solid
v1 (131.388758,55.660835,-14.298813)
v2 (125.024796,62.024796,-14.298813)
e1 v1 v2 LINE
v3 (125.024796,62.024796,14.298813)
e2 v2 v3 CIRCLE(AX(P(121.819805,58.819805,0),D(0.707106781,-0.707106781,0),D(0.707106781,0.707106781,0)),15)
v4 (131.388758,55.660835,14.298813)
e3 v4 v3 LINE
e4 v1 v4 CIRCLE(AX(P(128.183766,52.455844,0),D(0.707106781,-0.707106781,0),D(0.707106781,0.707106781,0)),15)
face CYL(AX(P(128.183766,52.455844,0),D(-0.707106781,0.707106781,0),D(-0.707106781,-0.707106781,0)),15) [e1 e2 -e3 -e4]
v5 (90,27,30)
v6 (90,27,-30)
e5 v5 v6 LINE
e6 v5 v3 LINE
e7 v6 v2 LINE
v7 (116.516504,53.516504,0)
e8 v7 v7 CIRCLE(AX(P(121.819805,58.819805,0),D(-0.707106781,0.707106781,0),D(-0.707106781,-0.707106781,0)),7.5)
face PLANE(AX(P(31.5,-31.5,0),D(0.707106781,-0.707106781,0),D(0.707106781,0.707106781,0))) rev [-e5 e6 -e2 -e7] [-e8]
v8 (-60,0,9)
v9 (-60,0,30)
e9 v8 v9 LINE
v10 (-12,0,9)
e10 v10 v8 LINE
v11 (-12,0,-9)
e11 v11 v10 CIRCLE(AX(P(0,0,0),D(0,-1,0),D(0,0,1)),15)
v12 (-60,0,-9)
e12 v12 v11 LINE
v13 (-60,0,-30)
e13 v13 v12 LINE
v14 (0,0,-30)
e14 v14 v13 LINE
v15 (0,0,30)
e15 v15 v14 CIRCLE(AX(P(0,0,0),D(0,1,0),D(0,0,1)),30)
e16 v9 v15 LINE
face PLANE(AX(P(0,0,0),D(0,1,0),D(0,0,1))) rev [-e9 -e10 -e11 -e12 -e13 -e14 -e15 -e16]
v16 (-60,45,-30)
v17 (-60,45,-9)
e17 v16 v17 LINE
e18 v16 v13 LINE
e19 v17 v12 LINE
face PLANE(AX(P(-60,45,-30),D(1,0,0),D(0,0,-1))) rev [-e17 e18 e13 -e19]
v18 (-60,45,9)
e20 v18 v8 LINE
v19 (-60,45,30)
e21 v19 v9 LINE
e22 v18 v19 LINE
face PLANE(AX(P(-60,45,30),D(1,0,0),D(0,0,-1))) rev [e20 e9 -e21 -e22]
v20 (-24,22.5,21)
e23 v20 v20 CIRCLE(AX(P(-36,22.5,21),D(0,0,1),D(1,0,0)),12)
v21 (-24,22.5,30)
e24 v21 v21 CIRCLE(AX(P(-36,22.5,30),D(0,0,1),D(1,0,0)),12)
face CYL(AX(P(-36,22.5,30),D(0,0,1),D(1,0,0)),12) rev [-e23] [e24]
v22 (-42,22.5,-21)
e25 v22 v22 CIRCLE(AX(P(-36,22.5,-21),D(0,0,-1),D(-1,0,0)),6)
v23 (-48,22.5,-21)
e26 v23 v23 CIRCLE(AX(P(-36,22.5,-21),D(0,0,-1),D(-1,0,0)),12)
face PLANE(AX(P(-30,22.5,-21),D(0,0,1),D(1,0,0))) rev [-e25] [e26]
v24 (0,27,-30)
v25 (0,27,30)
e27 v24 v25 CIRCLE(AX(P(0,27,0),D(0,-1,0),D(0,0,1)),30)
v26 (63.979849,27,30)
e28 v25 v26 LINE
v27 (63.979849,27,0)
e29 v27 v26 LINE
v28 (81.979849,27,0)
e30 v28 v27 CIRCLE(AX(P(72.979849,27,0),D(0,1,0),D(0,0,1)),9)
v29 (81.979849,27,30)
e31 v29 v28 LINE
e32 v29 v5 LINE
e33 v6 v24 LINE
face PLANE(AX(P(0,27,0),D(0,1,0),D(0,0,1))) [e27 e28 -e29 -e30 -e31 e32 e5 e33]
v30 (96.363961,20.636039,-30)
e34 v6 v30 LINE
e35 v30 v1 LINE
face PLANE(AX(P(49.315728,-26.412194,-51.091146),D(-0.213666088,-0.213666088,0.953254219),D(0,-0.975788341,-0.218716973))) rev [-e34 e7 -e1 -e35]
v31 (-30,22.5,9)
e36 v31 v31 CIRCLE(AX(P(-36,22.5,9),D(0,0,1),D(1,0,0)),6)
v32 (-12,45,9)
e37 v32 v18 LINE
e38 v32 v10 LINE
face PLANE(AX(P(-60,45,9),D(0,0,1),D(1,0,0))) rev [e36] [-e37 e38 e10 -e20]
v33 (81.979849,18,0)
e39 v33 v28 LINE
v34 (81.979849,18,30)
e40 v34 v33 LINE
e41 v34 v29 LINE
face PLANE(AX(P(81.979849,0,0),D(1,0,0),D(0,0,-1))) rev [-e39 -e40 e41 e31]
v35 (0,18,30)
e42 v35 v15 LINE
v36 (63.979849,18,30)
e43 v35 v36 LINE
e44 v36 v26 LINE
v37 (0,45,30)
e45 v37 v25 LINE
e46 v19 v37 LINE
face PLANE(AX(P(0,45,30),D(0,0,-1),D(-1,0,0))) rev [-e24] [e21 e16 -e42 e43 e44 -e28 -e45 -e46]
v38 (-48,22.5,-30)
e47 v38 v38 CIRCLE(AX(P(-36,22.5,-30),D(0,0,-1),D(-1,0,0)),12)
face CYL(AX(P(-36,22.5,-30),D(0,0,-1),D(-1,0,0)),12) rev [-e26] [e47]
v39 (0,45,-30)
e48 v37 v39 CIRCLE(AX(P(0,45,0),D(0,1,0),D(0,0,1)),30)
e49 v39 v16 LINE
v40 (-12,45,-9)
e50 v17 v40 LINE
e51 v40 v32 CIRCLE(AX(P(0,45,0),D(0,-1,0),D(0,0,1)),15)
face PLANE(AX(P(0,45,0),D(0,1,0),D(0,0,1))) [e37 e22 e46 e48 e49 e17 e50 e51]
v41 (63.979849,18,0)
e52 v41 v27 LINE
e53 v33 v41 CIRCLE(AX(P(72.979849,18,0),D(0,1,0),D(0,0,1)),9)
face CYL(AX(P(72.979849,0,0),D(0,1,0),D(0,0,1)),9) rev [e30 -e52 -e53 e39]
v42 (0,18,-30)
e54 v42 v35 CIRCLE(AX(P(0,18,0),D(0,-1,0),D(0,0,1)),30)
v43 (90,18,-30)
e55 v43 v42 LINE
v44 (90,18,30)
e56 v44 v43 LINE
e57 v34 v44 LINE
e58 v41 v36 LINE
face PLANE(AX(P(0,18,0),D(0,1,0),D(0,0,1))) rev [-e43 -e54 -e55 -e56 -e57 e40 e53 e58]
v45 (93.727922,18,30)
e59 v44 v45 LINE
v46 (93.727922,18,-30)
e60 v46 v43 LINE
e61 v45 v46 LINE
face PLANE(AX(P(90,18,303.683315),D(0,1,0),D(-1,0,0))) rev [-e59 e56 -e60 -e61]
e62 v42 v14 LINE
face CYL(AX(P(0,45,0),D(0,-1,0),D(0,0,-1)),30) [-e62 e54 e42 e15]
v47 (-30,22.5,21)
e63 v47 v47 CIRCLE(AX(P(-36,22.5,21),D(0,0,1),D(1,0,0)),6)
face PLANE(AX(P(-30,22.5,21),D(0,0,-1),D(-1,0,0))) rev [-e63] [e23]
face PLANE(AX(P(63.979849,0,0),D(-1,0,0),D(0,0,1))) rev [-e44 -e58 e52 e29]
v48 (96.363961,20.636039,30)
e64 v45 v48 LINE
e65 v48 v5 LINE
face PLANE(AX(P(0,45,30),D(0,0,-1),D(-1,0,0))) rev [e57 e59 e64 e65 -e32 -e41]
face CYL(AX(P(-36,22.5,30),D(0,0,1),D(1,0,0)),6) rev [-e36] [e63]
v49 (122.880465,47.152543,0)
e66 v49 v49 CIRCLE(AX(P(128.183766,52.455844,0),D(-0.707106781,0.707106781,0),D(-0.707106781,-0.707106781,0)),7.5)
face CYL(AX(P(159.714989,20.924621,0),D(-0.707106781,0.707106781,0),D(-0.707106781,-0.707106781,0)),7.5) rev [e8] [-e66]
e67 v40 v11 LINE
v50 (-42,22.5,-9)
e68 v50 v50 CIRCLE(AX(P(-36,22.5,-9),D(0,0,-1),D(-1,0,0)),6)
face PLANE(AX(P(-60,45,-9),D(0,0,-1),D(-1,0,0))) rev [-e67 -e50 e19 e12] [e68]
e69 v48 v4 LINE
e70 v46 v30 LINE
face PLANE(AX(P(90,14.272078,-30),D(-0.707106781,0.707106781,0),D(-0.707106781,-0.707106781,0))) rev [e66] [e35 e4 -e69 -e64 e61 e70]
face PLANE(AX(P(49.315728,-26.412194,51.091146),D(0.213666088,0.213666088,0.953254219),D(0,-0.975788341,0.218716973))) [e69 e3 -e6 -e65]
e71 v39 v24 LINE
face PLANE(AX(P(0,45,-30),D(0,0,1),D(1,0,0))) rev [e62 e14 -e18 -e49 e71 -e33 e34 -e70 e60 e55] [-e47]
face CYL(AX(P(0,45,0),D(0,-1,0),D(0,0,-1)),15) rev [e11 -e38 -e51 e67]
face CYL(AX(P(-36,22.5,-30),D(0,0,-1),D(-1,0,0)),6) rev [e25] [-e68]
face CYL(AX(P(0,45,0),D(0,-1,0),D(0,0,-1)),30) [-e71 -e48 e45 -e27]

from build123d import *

# Parameters (mm, degrees)
BOSS_EXTRUDE1_DEPTH                                  = 45
CBORE_FOR_M24_HEX_SOCKET_HEAD_CAP_SCREW1_D           = 12
CBORE_FOR_M24_HEX_SOCKET_HEAD_CAP_SCREW1_DEPTH       = 21
CBORE_FOR_M24_HEX_SOCKET_HEAD_CAP_SCREW1_CBORE_D     = 24
CBORE_FOR_M24_HEX_SOCKET_HEAD_CAP_SCREW1_CBORE_DEPTH = 9
BOSS_EXTRUDE2_DEPTH                                  = 4.5
BOSS_EXTRUDE3_DEPTH                                  = 9
SKETCH7_W                                            = 60
SKETCH7_H                                            = 9
BOSS_EXTRUDE4_DEPTH                                  = 9
CUT_EXTRUDE2_START                                   = -60
CUT_EXTRUDE2_DEPTH                                   = 60
SKETCH9_R                                            = 7.5
CUT_EXTRUDE3_DEPTH                                   = 151.324191827
CUT_EXTRUDE4_DEPTH                                   = 149.198401551


# Read off the part's stored shape, not the designer's step: Cut-Extrude2
with BuildPart() as part:
    # Sketch1 → Boss-Extrude1 (new body)
    with BuildSketch(Plane(origin=(0, 0, 0), x_dir=(1, 0, 0), z_dir=(0, 1, 0))):
        with BuildLine():
            Line((0, -30), (-60, -30))
            Line((-60, -30), (-60, -9))
            Line((-60, -9), (-12, -9))
            ThreePointArc((-12, -9), (15, 0), (-12, 9))
            Line((-12, 9), (-60, 9))
            Line((-60, 9), (-60, 30))
            Line((-60, 30), (0, 30))
            ThreePointArc((0, 30), (30, 0), (0, -30))
        make_face()
    extrude(amount=BOSS_EXTRUDE1_DEPTH)

    # CBORE for M24 Hex Socket Head Cap Screw1
    with Locations(Plane.XY.offset(30)):
        with Locations((-36, 22.5)):
            cbore_for_m24_hex_socket_head_cap_screw1 = CounterBoreHole(CBORE_FOR_M24_HEX_SOCKET_HEAD_CAP_SCREW1_D / 2, CBORE_FOR_M24_HEX_SOCKET_HEAD_CAP_SCREW1_CBORE_D / 2, CBORE_FOR_M24_HEX_SOCKET_HEAD_CAP_SCREW1_CBORE_DEPTH, depth=CBORE_FOR_M24_HEX_SOCKET_HEAD_CAP_SCREW1_DEPTH)

    # Mirror1: CBORE for M24 Hex Socket Head Cap Screw1 across plane
    add(cbore_for_m24_hex_socket_head_cap_screw1.mirror(Plane.XY), mode=Mode.SUBTRACT)

    # Sketch4 → Boss-Extrude2 (add, symmetric)
    with BuildSketch(Plane(origin=(0, 22.5, 0), x_dir=(1, 0, 0), z_dir=(0, 1, 0))):
        with BuildLine():
            Line((0, 30), (90, 30))
            Line((90, 30), (90, -30))
            Line((90, -30), (0, -30))
            ThreePointArc((0, -30), (30, 0), (0, 30))
        make_face()
    extrude(amount=BOSS_EXTRUDE2_DEPTH, both=True)



with BuildPart() as body_2:
    # Sketch6 → Boss-Extrude3 (new body)
    with BuildSketch(Plane(origin=(31.5, -31.5, 0), x_dir=(0.7071067811865462, 0.7071067811865489, 0), z_dir=(0.7071067811865489, -0.7071067811865462, 0))):
        with BuildLine():
            Line((82.731493399, 30), (82.731493399, -30))
            Line((82.731493399, -30), (132.264035588, -14.298813283))
            ThreePointArc((132.264035588, -14.298813283), (142.731493399, 0), (132.264035588, 14.298813283))
            Line((132.264035588, 14.298813283), (82.731493399, 30))
        make_face()
    extrude(amount=BOSS_EXTRUDE3_DEPTH)


with BuildPart() as part_1:
    add(part.part)

    add(body_2.part)  # Boss-Extrude4 merges body 2
    # Sketch7 → Boss-Extrude4 (add)
    with BuildSketch(Plane(origin=(58.5, 58.5, 0), x_dir=(0, 0, 1), z_dir=(-0.7071067811865462, -0.7071067811865488, 0))):
        with Locations((0, -49.047727215)):
            Rectangle(SKETCH7_W, SKETCH7_H)
    extrude(amount=BOSS_EXTRUDE4_DEPTH)

    # Cut-Extrude2 outline → Cut-Extrude2 (cut)
    with BuildSketch(Plane.XY.offset(30).offset(CUT_EXTRUDE2_START)):
        Polygon((90, 14.272077939), (93.727922061, 18), (86.272077939, 18), align=None)
    extrude(amount=CUT_EXTRUDE2_DEPTH, mode=Mode.SUBTRACT)

    # Sketch9 → Cut-Extrude3 (cut, through all)
    with BuildSketch(Plane(origin=(31.5, -31.5, 0), x_dir=(0, 0, 1), z_dir=(-0.7071067811865488, 0.7071067811865464, 0))):
        with Locations(Location((0, 127.731493399, 0), (0, 0, 270))):
            Circle(SKETCH9_R)
    extrude(amount=-CUT_EXTRUDE3_DEPTH, mode=Mode.SUBTRACT)

    # Sketch10 → Cut-Extrude4 (cut, through all)
    with BuildSketch(Plane(origin=(0, 27, 0), x_dir=(1, 0, 0), z_dir=(0, 1, 0))):
        with BuildLine():
            ThreePointArc((81.979848708, 0), (72.979848708, 9), (63.979848708, 0))
            Line((63.979848708, 0), (63.979848708, -30))
            Line((63.979848708, -30), (81.979848708, -30))
            Line((81.979848708, -30), (81.979848708, 0))
        make_face()
    extrude(amount=-CUT_EXTRUDE4_DEPTH, mode=Mode.SUBTRACT)


solid = part_1.part
